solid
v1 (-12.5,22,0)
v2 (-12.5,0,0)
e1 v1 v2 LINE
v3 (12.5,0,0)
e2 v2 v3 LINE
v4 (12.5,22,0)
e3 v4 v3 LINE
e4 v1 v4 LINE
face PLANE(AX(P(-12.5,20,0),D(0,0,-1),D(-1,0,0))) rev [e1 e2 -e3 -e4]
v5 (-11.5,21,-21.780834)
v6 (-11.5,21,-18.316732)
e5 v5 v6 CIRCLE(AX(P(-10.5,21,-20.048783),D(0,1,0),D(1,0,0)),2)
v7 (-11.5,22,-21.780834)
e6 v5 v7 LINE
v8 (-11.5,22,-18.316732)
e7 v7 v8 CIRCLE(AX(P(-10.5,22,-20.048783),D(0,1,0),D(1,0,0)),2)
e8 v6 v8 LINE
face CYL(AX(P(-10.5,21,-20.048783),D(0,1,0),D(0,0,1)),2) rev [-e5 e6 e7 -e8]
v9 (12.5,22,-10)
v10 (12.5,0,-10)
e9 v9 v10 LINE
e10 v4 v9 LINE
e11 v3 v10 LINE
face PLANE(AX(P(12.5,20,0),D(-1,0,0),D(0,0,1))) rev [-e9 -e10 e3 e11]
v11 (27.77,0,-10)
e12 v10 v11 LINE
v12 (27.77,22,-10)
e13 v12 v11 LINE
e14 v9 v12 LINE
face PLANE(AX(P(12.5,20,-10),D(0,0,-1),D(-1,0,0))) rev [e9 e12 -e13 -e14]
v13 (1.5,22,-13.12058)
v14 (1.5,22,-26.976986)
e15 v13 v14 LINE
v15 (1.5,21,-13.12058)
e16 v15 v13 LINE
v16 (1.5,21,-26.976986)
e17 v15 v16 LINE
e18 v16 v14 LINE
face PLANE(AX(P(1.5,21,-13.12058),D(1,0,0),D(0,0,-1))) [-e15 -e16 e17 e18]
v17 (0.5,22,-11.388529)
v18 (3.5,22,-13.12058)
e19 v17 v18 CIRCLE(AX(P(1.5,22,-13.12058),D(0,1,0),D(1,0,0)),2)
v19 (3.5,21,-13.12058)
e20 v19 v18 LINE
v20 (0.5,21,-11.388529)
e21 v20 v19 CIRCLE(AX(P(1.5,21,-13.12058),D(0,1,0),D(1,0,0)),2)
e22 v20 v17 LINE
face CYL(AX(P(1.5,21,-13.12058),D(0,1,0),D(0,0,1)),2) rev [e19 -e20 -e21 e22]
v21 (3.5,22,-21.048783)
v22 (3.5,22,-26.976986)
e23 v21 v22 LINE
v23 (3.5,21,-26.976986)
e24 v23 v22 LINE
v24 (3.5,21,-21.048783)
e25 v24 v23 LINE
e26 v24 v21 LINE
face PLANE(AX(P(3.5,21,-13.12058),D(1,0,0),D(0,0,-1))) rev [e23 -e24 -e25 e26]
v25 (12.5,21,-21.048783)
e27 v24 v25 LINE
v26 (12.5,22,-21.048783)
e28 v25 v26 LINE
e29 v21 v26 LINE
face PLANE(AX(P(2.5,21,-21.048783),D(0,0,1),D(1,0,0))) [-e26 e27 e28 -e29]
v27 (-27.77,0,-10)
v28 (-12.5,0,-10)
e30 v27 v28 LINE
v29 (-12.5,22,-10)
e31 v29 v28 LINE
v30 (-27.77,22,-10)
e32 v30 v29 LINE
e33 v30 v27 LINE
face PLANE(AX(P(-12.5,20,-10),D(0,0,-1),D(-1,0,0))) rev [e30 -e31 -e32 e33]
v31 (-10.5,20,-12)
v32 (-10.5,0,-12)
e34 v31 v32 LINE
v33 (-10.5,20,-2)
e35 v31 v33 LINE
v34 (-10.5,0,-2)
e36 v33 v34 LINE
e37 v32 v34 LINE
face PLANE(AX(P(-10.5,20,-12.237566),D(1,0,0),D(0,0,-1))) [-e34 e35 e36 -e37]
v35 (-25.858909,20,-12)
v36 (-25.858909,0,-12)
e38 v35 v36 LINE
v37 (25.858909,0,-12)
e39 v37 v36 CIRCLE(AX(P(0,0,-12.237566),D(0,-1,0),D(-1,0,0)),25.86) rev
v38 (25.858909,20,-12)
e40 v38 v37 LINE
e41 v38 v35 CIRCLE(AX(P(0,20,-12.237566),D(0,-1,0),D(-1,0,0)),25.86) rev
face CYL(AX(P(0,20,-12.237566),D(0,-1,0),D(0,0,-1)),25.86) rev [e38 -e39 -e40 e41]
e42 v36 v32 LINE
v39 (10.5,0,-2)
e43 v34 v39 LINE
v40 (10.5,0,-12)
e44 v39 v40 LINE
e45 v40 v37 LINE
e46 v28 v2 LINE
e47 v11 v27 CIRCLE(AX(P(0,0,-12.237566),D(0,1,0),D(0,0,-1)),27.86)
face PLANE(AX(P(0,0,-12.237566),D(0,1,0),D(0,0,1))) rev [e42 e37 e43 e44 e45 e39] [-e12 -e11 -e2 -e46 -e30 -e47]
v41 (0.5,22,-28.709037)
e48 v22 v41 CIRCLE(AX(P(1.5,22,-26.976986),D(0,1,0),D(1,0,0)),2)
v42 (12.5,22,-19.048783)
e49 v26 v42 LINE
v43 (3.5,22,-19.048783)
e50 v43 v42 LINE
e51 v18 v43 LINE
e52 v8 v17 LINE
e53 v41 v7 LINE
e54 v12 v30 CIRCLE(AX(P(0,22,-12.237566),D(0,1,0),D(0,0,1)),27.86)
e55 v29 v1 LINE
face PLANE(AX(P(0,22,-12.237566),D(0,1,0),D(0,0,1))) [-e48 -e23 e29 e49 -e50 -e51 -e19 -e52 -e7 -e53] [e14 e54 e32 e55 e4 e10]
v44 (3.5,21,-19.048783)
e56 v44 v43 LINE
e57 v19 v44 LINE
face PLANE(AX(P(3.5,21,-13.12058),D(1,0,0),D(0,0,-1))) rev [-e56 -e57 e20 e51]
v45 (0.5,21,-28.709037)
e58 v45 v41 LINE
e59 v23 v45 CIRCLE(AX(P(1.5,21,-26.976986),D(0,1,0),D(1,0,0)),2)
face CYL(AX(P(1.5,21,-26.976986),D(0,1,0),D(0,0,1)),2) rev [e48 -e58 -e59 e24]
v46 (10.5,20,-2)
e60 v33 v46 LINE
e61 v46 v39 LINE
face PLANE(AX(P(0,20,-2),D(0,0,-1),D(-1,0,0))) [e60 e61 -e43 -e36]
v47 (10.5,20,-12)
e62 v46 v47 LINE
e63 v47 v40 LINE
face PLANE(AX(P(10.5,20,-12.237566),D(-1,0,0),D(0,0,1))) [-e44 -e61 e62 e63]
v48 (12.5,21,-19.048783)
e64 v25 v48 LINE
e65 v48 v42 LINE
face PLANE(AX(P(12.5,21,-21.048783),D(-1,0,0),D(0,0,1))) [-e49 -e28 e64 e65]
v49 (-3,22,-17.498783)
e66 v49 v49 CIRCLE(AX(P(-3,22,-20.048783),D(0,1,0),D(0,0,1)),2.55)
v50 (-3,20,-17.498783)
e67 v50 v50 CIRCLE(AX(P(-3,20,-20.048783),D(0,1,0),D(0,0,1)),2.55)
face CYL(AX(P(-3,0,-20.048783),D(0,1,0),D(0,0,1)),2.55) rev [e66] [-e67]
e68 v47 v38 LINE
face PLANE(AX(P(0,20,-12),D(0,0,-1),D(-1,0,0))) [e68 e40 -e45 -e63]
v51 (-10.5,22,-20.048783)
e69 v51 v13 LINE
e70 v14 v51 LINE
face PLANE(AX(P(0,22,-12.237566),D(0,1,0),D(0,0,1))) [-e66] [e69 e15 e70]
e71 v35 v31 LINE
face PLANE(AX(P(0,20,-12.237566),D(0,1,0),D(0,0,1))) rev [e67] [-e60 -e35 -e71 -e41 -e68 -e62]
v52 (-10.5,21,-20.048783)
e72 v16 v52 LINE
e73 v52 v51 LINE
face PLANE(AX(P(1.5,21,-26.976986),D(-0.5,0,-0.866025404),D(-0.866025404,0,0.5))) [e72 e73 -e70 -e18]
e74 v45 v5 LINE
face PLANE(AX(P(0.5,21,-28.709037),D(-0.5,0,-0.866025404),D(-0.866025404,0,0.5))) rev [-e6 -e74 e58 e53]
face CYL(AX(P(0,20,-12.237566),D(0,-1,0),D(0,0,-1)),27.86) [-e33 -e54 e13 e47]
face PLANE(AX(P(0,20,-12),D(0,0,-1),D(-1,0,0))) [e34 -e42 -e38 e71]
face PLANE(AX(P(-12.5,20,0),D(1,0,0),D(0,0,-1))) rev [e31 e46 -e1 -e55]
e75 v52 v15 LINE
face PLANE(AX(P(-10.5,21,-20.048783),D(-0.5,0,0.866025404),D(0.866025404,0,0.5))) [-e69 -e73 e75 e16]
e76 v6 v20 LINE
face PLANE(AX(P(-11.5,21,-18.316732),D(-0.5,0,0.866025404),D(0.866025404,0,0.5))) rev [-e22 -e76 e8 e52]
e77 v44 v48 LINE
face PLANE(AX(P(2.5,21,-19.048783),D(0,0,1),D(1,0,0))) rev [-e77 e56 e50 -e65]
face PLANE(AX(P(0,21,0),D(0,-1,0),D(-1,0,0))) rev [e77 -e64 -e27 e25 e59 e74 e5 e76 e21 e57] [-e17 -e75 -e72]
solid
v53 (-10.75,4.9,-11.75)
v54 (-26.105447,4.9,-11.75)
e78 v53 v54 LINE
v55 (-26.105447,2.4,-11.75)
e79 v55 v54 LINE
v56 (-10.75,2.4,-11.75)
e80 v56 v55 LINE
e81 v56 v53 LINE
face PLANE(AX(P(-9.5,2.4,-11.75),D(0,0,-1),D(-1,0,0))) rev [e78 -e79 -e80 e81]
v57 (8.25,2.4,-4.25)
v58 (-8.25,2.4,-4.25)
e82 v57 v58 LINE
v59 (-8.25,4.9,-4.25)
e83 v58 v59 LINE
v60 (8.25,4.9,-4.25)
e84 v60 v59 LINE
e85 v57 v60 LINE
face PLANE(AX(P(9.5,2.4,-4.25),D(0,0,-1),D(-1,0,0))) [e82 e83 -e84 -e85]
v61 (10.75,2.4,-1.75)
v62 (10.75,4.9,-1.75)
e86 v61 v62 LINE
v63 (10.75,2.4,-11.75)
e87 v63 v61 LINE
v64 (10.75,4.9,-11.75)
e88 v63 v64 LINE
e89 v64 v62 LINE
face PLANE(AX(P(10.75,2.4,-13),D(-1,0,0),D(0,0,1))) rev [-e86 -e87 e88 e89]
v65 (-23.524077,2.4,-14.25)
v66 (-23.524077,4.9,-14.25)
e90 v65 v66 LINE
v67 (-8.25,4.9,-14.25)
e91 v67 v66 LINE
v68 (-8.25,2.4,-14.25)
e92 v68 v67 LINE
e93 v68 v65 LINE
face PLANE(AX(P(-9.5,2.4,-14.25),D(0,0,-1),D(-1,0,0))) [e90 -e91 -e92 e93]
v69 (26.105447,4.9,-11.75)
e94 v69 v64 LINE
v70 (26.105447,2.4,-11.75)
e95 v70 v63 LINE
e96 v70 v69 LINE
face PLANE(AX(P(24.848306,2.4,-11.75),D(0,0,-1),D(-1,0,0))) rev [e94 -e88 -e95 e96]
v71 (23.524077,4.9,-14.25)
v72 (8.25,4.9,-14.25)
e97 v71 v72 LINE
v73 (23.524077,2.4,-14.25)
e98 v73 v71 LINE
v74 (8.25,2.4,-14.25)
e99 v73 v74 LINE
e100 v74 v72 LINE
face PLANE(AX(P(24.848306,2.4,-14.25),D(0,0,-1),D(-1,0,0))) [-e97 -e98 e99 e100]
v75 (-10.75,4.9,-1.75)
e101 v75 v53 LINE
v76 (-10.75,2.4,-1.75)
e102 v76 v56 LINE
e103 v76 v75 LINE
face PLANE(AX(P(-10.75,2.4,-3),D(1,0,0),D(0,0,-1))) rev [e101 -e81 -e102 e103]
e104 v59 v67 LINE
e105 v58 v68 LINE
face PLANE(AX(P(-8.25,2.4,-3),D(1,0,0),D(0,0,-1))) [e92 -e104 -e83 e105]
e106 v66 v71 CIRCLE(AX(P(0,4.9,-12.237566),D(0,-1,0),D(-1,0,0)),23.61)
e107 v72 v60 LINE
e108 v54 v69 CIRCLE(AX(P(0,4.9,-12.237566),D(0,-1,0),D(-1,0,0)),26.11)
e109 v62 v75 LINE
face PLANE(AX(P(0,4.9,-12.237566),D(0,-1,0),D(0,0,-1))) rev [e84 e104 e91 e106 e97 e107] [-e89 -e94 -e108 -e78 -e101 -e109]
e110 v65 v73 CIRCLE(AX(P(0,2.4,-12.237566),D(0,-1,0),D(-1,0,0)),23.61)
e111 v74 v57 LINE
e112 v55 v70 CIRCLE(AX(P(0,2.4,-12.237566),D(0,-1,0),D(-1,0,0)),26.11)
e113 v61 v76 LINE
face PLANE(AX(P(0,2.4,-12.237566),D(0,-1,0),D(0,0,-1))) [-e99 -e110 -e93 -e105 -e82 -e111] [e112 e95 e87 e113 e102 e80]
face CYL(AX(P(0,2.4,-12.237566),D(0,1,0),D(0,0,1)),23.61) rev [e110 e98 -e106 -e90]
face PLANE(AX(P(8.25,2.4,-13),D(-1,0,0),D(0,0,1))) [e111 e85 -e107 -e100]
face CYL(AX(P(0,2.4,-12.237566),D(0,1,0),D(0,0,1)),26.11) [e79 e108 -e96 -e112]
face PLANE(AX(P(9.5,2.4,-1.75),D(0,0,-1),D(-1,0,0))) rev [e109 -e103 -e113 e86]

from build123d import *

# Parameters (mm, degrees)
EXTRUIR_L_MINA1_DEPTH        = 20
SALIENTE_EXTRUIR1_DEPTH      = 2
EXTRUIR_L_MINA2_DEPTH        = 2.5
CORTAR_EXTRUIR_L_MINA1_START = -1
CORTAR_EXTRUIR_L_MINA1_DEPTH = 1
CROQUIS11_R                  = 2.55
CORTAR_EXTRUIR1_DEPTH        = 54.553658795


# Read off the part's stored shape, not the designer's step: Cortar-Extruir-Lámina1
with BuildPart() as part:
    # Croquis1 → Extruir-Lámina1 (new body)
    with BuildSketch(Plane(origin=(0, 0, 0), x_dir=(1, 0, 0), z_dir=(0, 1, 0))):
        with BuildLine():
            Line((-27.77, 10), (-12.5, 10))
            Line((-12.5, 10), (-12.5, 0))
            Line((-12.5, 0), (12.5, 0))
            Line((12.5, 0), (12.5, 10))
            Line((12.5, 10), (27.77, 10))
            ThreePointArc((27.77, 10), (0, 40.097565641), (-27.77, 10))
        make_face()
        with BuildLine():
            Line((-25.858908766, 12), (-10.5, 12))
            Line((-10.5, 12), (-10.5, 2))
            Line((-10.5, 2), (10.5, 2))
            Line((10.5, 2), (10.5, 12))
            Line((10.5, 12), (25.858908766, 12))
            ThreePointArc((25.858908766, 12), (0, 38.097565641), (-25.858908766, 12))
        make_face(mode=Mode.SUBTRACT)
    extrude(amount=EXTRUIR_L_MINA1_DEPTH)

    # Croquis2 → Saliente-Extruir1 (add)
    with BuildSketch(Plane(origin=(0, 20, 0), x_dir=(1, 0, 0), z_dir=(0, 1, 0))):
        with BuildLine():
            Line((12.5, 10), (27.77, 10))
            ThreePointArc((27.77, 10), (0, 40.097565641), (-27.77, 10))
            Line((-27.77, 10), (-12.5, 10))
            Line((-12.5, 10), (-12.5, 0))
            Line((-12.5, 0), (12.5, 0))
            Line((12.5, 0), (12.5, 10))
        make_face()
    extrude(amount=SALIENTE_EXTRUIR1_DEPTH)

    # Cortar-Extruir-Lámina1 outline → Cortar-Extruir-Lámina1 (cut)
    with BuildSketch(Plane(origin=(0, 22, 0), x_dir=(1, 0, 0), z_dir=(0, 1, 0)).offset(CORTAR_EXTRUIR_L_MINA1_START)):
        with BuildLine():
            Line((3.5, 13.12057959), (3.5, 19.048782821))
            Line((3.5, 19.048782821), (12.5, 19.048782821))
            Line((12.5, 19.048782821), (12.5, 21.048782821))
            Line((12.5, 21.048782821), (3.5, 21.048782821))
            Line((3.5, 21.048782821), (3.5, 26.976986051))
            ThreePointArc((3.5, 26.976986051), (2.5, 28.709036859), (0.5, 28.709036859))
            Line((0.5, 28.709036859), (-11.5, 21.780833628))
            ThreePointArc((-11.5, 21.780833628), (-12.5, 20.04878282), (-11.5, 18.316732013))
            Line((-11.5, 18.316732013), (0.5, 11.388528783))
            ThreePointArc((0.5, 11.388528783), (2.5, 11.388528783), (3.5, 13.12057959))
        make_face()
        Polygon((-10.5, 20.048782821), (1.5, 26.976986051), (1.5, 13.12057959), align=None, mode=Mode.SUBTRACT)
    extrude(amount=CORTAR_EXTRUIR_L_MINA1_DEPTH, mode=Mode.SUBTRACT)

    # Croquis11 → Cortar-Extruir1 (cut, through all)
    with BuildSketch(Plane(origin=(0, 22, 0), x_dir=(1, 0, 0), z_dir=(0, 1, 0))):
        with Locations(Location((-3, 20.048782821, 0), (0, 0, 270))):
            Circle(CROQUIS11_R)
    extrude(amount=-CORTAR_EXTRUIR1_DEPTH, mode=Mode.SUBTRACT)


with BuildPart() as body_2:
    # Croquis9 → Extruir-Lámina2 (new body)
    with BuildSketch(Plane(origin=(0, 4.9, 0), x_dir=(-1, 0, 0), z_dir=(0, -1, 0))):
        with BuildLine():
            Line((-26.105447319, 11.75), (-10.75, 11.75))
            Line((-10.75, 11.75), (-10.75, 1.75))
            Line((-10.75, 1.75), (10.75, 1.75))
            Line((10.75, 1.75), (10.75, 11.75))
            Line((10.75, 11.75), (26.105447319, 11.75))
            ThreePointArc((26.105447319, 11.75), (0, 38.347565641), (-26.105447319, 11.75))
        make_face()
        with BuildLine():
            Line((-23.524077197, 14.25), (-8.25, 14.25))
            Line((-8.25, 14.25), (-8.25, 4.25))
            Line((-8.25, 4.25), (8.25, 4.25))
            Line((8.25, 4.25), (8.25, 14.25))
            Line((8.25, 14.25), (23.524077197, 14.25))
            ThreePointArc((23.524077197, 14.25), (0, 35.847565641), (-23.524077197, 14.25))
        make_face(mode=Mode.SUBTRACT)
    extrude(amount=EXTRUIR_L_MINA2_DEPTH)


solid = Compound([part.part, body_2.part])
